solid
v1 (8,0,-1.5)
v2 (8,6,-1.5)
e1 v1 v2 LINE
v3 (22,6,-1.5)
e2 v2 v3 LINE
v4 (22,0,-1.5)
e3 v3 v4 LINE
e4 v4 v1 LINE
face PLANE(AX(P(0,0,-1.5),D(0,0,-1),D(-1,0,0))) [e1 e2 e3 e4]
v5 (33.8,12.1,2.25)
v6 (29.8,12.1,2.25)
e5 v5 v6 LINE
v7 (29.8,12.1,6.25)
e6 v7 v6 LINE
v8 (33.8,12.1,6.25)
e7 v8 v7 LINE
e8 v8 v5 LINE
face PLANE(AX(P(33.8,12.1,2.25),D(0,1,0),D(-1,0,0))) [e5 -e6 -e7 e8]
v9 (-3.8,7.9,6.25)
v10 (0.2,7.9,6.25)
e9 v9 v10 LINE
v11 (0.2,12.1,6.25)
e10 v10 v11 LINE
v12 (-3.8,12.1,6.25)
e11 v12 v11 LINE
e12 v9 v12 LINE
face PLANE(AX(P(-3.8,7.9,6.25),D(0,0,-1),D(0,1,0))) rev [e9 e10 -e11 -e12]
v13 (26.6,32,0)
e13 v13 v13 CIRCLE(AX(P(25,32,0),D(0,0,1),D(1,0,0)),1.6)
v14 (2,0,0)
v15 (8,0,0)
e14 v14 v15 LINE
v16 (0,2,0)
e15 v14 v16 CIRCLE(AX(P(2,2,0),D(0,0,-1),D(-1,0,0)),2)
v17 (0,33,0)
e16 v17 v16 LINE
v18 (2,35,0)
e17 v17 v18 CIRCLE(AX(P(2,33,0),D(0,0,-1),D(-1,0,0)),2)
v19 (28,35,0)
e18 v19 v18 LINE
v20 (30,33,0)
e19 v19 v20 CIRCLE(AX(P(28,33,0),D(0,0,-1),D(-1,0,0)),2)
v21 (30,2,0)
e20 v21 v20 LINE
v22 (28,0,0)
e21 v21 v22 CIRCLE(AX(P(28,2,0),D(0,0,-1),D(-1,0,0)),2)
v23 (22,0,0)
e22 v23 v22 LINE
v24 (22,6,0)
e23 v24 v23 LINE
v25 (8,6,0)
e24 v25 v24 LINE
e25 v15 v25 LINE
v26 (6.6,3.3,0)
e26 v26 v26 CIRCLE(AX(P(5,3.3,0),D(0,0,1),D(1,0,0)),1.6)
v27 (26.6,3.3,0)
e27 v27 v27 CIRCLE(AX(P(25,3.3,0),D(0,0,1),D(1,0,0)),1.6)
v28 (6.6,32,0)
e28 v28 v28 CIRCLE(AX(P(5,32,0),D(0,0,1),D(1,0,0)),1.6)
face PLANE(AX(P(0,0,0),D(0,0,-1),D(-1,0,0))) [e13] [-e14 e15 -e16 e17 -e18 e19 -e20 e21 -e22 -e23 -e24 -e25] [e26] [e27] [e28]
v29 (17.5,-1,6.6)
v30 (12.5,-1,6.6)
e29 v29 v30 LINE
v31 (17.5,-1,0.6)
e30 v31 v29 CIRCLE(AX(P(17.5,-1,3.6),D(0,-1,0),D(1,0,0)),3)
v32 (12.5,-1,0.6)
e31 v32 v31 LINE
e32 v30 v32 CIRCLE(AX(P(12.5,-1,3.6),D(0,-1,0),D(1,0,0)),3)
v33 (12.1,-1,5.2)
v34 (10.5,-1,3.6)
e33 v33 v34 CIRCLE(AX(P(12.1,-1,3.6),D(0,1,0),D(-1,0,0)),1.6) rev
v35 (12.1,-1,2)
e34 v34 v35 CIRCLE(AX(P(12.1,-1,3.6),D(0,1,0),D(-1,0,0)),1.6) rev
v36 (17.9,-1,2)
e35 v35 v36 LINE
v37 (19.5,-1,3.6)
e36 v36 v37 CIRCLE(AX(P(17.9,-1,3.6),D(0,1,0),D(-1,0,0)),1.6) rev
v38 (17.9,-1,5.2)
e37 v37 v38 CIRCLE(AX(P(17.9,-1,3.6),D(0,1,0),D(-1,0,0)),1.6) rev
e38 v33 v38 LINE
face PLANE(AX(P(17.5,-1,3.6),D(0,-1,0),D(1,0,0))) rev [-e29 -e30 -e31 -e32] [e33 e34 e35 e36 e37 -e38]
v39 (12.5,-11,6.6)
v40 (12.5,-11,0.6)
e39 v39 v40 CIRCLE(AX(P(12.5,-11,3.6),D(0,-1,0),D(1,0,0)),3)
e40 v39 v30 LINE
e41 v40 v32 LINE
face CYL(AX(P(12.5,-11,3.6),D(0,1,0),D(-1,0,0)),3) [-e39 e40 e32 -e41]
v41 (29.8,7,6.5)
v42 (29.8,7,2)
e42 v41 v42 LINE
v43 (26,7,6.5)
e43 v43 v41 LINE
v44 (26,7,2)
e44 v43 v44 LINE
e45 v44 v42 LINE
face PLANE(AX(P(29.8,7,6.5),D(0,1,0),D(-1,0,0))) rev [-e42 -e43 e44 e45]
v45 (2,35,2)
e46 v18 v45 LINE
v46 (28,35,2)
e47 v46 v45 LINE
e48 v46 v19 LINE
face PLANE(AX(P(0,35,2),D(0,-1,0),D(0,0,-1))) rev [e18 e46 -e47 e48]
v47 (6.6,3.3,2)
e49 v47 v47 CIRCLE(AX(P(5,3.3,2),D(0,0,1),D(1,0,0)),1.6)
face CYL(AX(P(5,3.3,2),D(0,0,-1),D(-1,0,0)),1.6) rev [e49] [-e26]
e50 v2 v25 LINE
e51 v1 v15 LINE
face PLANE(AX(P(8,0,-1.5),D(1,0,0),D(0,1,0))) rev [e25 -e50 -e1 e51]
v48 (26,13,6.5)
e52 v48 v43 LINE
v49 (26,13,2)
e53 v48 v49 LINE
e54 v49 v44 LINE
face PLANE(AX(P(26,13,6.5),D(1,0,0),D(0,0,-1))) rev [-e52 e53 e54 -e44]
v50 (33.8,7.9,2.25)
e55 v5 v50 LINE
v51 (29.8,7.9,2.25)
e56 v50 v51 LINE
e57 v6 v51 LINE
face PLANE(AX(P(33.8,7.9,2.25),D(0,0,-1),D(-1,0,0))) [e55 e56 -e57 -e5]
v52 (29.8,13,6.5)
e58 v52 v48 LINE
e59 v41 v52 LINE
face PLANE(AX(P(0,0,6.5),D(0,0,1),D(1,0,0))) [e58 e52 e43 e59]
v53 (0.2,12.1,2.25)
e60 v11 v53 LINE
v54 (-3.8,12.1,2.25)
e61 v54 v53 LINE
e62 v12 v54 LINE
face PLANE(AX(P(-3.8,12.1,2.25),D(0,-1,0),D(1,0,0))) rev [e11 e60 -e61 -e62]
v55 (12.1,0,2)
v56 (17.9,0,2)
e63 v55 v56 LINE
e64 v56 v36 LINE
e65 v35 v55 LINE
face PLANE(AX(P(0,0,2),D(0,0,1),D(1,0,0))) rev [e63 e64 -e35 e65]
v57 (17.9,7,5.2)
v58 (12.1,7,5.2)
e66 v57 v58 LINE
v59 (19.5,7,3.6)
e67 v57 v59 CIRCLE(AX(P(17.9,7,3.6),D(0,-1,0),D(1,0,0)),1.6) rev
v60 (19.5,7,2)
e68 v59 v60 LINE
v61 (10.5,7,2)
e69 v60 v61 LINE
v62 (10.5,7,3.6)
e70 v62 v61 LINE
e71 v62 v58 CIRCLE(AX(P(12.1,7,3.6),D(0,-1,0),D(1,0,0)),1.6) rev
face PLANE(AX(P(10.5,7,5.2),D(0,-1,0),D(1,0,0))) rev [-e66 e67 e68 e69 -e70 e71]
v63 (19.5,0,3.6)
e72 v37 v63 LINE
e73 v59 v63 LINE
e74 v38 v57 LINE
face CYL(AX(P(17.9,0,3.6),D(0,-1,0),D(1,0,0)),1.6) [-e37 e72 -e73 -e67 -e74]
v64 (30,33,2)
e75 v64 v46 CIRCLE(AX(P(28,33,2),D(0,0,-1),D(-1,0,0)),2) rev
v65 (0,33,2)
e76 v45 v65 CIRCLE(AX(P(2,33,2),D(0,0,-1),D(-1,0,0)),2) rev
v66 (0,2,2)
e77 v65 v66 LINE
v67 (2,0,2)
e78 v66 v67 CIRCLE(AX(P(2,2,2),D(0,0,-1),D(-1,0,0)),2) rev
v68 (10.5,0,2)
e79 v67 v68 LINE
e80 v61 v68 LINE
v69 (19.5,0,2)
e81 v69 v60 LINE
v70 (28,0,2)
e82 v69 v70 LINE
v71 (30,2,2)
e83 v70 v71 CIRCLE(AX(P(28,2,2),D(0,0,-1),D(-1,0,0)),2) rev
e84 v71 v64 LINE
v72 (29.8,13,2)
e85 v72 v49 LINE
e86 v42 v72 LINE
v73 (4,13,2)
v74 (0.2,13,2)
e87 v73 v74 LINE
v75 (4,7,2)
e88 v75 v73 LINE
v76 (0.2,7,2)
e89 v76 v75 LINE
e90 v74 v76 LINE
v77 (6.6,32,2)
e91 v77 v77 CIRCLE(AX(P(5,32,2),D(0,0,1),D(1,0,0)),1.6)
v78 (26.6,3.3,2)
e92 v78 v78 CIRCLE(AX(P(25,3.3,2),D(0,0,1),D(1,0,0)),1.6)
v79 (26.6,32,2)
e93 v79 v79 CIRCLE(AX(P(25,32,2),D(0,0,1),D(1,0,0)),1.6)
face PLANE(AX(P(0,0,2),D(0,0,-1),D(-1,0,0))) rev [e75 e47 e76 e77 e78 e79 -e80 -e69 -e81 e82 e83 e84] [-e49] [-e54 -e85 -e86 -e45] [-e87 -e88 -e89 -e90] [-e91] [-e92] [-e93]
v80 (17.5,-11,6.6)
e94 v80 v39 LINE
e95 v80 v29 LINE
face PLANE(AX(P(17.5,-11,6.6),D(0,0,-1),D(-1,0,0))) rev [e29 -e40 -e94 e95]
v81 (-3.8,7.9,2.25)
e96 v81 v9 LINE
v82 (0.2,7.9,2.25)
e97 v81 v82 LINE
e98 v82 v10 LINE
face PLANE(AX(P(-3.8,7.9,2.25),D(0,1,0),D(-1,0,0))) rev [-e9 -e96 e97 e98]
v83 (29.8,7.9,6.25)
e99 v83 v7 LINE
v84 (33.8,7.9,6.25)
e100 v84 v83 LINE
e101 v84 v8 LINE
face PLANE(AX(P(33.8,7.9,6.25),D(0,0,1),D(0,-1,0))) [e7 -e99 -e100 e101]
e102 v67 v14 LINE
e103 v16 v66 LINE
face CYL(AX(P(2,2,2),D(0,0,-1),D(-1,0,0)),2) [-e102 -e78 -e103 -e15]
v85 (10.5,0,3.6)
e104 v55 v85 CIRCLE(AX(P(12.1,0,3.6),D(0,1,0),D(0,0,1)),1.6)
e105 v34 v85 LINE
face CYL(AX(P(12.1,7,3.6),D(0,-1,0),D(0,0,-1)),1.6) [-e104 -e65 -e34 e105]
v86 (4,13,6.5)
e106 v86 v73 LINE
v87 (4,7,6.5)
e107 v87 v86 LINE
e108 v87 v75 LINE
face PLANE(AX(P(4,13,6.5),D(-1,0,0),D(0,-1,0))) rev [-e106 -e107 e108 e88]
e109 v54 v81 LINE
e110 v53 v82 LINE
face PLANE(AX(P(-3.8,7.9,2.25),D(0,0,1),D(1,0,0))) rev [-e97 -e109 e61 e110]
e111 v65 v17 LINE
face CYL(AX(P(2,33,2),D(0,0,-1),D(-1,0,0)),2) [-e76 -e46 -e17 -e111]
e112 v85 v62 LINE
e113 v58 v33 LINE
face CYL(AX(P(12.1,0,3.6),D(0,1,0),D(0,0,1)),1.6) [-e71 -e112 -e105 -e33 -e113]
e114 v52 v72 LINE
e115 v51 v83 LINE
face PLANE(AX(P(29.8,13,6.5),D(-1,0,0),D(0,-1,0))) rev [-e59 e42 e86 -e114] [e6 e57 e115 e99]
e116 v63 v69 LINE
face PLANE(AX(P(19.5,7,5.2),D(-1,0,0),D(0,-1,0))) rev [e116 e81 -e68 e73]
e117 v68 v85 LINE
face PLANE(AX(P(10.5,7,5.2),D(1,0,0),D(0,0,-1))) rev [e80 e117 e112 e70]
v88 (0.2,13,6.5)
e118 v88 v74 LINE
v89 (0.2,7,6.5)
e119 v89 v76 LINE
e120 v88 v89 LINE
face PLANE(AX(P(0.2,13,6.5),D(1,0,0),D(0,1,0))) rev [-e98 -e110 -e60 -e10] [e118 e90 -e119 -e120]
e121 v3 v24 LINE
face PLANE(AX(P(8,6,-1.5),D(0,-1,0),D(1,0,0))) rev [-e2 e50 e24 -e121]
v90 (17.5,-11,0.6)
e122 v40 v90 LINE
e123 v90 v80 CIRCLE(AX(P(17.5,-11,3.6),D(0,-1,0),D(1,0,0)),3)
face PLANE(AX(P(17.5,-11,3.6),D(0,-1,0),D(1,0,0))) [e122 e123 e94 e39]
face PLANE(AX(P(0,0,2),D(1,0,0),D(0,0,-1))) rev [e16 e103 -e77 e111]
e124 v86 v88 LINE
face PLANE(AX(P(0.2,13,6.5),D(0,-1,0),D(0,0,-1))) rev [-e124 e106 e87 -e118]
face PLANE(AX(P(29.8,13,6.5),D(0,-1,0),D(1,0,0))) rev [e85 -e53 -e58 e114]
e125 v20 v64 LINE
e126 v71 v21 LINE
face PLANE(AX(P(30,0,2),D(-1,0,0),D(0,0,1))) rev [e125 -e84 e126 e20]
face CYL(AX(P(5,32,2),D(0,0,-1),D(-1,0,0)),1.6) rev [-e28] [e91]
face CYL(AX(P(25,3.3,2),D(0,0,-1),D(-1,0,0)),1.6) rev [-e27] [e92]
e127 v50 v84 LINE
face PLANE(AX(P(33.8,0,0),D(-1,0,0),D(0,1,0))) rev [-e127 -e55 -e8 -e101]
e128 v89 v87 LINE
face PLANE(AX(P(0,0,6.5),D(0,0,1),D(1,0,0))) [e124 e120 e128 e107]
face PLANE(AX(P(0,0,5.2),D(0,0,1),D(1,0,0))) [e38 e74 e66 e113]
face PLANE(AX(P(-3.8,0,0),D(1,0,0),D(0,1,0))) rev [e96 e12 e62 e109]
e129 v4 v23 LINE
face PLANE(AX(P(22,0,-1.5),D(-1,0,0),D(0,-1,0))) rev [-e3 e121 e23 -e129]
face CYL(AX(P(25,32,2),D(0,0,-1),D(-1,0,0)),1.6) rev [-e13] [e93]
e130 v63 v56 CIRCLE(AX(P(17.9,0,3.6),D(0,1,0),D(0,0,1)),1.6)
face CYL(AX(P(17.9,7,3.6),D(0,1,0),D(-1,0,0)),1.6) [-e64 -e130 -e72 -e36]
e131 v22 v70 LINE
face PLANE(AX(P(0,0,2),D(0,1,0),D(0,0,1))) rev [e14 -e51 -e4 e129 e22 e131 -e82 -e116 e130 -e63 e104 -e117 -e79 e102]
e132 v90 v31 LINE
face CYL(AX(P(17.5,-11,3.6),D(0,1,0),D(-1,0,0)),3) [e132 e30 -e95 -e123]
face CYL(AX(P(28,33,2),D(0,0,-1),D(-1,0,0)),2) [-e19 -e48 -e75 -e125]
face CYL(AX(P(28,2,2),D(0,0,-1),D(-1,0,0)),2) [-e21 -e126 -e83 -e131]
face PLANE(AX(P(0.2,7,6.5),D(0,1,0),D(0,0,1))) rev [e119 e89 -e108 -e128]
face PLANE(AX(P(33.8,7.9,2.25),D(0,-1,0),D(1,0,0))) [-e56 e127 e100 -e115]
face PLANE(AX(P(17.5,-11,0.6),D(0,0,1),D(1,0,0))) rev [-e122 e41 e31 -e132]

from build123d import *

# Parameters (mm, degrees)
SKETCH_1_W      = 30
SKETCH_1_H      = 35
SKETCH_1_R      = 1.6
EXTRUDE_1_DEPTH = 2
SKETCH_2_W      = 9
SKETCH_2_H      = 8
EXTRUDE_2_DEPTH = 3.2
SKETCH_3_W      = 3.8
SKETCH_3_H      = 6
EXTRUDE_3_DEPTH = 4.5
SKETCH_4_W      = 14
SKETCH_4_H      = 6
EXTRUDE_4_DEPTH = 1.5
FILLET_1_R      = 1.6
FILLET_2_R      = 2
SKETCH_5_W      = 4
SKETCH_5_H      = 4.2
EXTRUDE_5_DEPTH = 4
EXTRUDE_6_DEPTH = 10


with BuildPart() as part:
    # 草图1 → 凸台-拉伸1 (new body)
    with BuildSketch(Plane.XY):
        with Locations((15, 17.5)):
            Rectangle(SKETCH_1_W, SKETCH_1_H)
        with Locations((5, 32)):
            Circle(SKETCH_1_R, mode=Mode.SUBTRACT)
        with Locations((25, 32)):
            Circle(SKETCH_1_R, mode=Mode.SUBTRACT)
        with Locations((5, 3.3)):
            Circle(SKETCH_1_R, mode=Mode.SUBTRACT)
        with Locations((25, 3.3)):
            Circle(SKETCH_1_R, mode=Mode.SUBTRACT)
    extrude(amount=EXTRUDE_1_DEPTH)

    # 草图2 → 凸台-拉伸2 (add)
    with BuildSketch(Plane.XY.offset(2)):
        with Locations((15, 3)):
            Rectangle(SKETCH_2_W, SKETCH_2_H)
    extrude(amount=EXTRUDE_2_DEPTH)

    # 草图3 → 凸台-拉伸3 (add)
    with BuildSketch(Plane.XY.offset(2)):
        with Locations((2.1, 10)):
            Rectangle(SKETCH_3_W, SKETCH_3_H)
        with Locations((27.9, 10)):
            Rectangle(SKETCH_3_W, SKETCH_3_H)
    extrude(amount=EXTRUDE_3_DEPTH)

    # 草图4 → 凸台-拉伸4 (add)
    with BuildSketch(Plane(origin=(0, 0, 0), x_dir=(-1, 0, 0), z_dir=(0, 0, -1))):
        with Locations((-15, 3)):
            Rectangle(SKETCH_4_W, SKETCH_4_H)
    extrude(amount=EXTRUDE_4_DEPTH)

    # 圆角1
    fillet_1_edges = [part.edges().sort_by_distance(p)[0] for p in [
        (19.5, 3, 5.2),
        (19.5, -0.5, 2),
        (10.5, -0.5, 2),
        (10.5, 3, 5.2),
    ]]
    fillet(fillet_1_edges, radius=FILLET_1_R - 0.0001)  # a hair under: the kernel refuses the full size

    # 圆角2
    fillet_2_edges = [part.edges().sort_by_distance(p)[0] for p in [
        (0, 35, 1),
        (30, 35, 1),
        (30, 0, 1),
        (0, 0, 1),
    ]]
    fillet(fillet_2_edges, radius=FILLET_2_R)

    # 草图5 → 凸台-拉伸5 (add)
    with BuildSketch(Plane.ZY.offset(-0.2)):
        with Locations((4.25, 10)):
            Rectangle(SKETCH_5_W, SKETCH_5_H)
    extrude_5 = extrude(amount=EXTRUDE_5_DEPTH)

    # 镜向1: 凸台-拉伸5 across plane
    add(extrude_5.mirror(Plane.ZY.offset(-15)))

    # 草图6 → 凸台-拉伸6 (add)
    with BuildSketch(Plane.XZ.offset(1)):
        with BuildLine():
            Line((17.5, 0.6), (12.5, 0.6))
            ThreePointArc((12.5, 0.6), (9.5, 3.6), (12.5, 6.6))
            Line((12.5, 6.6), (17.5, 6.6))
            ThreePointArc((17.5, 6.6), (20.5, 3.6), (17.5, 0.6))
        make_face()
    extrude(amount=EXTRUDE_6_DEPTH)


solid = part.part
